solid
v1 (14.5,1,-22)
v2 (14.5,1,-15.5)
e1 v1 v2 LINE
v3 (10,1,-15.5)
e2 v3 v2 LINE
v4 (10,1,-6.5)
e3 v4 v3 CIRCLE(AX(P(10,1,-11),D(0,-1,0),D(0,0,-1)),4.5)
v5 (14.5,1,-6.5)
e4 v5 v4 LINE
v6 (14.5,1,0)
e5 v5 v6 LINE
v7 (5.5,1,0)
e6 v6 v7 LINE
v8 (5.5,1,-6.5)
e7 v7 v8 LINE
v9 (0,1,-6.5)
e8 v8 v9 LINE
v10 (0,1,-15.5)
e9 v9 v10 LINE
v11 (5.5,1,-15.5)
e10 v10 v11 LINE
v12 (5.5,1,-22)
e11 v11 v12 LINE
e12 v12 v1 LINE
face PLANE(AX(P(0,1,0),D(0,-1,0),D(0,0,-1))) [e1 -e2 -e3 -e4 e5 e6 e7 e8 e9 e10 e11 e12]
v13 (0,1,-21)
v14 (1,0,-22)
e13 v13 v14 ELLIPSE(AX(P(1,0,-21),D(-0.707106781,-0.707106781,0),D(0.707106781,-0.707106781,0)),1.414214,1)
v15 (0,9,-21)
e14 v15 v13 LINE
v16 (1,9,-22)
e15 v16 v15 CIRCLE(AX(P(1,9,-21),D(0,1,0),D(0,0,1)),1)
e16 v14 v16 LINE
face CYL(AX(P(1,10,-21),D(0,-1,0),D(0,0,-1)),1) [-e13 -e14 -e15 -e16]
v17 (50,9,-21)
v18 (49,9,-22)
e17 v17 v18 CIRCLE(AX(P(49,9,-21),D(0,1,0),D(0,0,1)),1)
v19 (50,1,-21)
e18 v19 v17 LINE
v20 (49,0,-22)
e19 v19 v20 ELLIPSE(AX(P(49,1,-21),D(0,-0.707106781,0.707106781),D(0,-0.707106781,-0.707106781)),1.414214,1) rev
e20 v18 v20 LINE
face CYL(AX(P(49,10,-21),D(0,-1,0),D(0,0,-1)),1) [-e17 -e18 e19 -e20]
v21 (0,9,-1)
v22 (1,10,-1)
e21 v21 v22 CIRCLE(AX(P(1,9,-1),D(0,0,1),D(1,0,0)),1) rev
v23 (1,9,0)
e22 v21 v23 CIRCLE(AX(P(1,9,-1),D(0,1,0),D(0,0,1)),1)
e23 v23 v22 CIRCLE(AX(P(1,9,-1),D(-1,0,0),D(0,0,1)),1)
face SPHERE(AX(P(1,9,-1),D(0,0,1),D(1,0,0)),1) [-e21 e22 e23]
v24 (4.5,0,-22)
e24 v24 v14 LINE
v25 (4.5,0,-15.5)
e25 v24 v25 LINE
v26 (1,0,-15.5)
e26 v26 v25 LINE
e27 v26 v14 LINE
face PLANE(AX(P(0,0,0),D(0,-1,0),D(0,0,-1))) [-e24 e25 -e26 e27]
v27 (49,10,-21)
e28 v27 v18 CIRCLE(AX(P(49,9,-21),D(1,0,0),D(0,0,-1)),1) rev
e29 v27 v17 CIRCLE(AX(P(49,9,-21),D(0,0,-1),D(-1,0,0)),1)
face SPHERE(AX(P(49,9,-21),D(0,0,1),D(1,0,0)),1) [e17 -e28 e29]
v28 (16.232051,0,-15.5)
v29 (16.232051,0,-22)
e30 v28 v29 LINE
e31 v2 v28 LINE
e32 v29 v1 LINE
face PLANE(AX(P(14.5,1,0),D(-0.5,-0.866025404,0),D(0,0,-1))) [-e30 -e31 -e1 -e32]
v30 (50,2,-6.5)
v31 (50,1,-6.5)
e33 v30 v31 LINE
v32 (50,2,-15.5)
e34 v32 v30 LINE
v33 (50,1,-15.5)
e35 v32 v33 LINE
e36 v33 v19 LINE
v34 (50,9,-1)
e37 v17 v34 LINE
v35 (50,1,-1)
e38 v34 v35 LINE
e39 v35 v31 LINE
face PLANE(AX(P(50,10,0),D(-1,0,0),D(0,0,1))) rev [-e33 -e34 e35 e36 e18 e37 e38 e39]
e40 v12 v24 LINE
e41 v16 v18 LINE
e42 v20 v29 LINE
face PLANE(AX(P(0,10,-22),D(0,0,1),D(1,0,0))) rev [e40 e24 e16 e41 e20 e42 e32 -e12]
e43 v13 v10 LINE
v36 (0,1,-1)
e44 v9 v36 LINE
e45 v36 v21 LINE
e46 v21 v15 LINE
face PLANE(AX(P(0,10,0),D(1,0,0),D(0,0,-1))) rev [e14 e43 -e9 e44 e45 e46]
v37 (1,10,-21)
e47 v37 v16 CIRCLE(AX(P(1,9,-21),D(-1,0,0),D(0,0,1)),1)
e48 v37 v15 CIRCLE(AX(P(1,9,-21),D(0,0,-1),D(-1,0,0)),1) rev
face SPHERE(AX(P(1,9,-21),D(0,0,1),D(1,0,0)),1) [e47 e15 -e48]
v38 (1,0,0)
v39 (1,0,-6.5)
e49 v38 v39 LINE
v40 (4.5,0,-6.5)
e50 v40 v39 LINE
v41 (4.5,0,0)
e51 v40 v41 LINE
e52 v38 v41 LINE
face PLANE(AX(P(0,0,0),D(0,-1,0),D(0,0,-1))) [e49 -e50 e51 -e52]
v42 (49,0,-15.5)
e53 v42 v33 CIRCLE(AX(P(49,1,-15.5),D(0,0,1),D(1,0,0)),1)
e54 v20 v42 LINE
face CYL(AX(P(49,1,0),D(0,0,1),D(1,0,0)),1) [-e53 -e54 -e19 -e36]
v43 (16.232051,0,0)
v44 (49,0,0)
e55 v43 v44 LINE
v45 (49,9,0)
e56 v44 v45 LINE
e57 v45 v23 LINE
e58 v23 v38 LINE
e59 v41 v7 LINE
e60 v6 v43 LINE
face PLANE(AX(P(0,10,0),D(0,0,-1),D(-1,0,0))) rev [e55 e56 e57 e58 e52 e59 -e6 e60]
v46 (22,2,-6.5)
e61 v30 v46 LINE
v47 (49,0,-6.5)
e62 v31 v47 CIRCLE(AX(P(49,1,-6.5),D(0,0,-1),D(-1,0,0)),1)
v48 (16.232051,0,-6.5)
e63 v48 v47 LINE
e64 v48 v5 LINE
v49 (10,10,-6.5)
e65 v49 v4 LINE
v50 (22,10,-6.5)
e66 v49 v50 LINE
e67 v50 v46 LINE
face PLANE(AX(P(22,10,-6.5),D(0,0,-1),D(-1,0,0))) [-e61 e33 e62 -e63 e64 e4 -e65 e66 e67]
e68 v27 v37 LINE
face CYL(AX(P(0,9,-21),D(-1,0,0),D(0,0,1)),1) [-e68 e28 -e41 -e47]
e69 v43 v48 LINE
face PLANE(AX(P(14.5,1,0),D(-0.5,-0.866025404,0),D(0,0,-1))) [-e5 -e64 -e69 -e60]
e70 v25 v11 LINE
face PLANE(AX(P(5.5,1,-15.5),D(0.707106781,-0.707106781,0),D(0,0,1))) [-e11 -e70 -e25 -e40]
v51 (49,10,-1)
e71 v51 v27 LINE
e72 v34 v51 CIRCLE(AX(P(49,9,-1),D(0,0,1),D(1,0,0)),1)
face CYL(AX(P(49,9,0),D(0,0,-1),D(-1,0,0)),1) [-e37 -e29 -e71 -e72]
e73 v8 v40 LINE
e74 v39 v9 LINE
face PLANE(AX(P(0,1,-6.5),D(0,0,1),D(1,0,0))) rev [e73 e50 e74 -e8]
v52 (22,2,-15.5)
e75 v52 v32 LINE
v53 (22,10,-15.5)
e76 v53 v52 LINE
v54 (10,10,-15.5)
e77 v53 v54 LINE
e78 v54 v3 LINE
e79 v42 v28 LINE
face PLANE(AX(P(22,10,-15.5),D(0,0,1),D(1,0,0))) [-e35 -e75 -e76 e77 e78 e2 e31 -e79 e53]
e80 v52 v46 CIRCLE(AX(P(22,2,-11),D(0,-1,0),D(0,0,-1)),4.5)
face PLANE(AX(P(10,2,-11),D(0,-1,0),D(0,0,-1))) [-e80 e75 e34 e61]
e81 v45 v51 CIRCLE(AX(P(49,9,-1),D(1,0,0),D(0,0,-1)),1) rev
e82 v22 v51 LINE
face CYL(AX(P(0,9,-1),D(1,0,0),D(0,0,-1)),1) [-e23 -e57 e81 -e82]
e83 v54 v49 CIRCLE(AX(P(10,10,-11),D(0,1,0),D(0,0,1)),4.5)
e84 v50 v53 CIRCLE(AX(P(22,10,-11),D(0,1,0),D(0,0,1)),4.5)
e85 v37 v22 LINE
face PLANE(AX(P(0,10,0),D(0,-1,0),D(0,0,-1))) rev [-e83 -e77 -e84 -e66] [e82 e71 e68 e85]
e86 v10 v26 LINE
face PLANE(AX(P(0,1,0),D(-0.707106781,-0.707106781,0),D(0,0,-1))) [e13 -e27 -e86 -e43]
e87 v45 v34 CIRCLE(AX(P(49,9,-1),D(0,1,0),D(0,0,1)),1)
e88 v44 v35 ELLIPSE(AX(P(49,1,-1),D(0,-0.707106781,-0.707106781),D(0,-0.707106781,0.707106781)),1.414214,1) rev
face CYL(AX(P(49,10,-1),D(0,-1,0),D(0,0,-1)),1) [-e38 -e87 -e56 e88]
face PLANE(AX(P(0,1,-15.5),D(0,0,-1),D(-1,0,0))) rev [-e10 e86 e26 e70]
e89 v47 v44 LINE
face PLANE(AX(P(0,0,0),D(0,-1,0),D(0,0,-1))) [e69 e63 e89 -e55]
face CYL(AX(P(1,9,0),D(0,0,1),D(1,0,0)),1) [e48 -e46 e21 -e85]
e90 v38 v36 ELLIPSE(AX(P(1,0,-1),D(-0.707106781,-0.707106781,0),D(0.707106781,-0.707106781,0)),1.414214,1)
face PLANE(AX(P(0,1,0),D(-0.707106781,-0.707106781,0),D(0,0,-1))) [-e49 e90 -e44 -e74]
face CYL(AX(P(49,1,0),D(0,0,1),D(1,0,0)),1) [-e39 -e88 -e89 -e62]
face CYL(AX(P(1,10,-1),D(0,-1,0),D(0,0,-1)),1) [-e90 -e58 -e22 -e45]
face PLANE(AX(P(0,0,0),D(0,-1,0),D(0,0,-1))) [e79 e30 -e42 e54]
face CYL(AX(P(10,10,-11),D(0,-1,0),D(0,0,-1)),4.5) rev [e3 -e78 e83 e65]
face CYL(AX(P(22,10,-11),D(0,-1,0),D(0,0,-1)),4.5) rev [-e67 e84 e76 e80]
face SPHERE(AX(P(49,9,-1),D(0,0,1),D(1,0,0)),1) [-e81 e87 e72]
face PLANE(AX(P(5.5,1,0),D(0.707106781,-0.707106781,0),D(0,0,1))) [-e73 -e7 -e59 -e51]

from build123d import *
from OCP.BRepFilletAPI import BRepFilletAPI_MakeChamfer

# Parameters (mm, degrees)
SKETCH_1_W          = 50
SKETCH_1_H          = 22
EXTRUDE_1_DEPTH     = 10
CUT_EXTRUDE_1_DEPTH = 2
CUT_EXTRUDE_2_DEPTH = 1
CHAMFER_1_SIZE      = 1
CHAMFER_2_SIZE      = 1
CHAMFER_2_SIZE_2    = 1.732050808
FILLET_1_R          = 1


with BuildPart() as part:
    # 草图1 → 凸台-拉伸1 (new body)
    with BuildSketch(Plane(origin=(0, 0, 0), x_dir=(1, 0, 0), z_dir=(0, 1, 0))):
        with Locations((25, 11)):
            Rectangle(SKETCH_1_W, SKETCH_1_H)
        with BuildLine():
            Line((22, 6.5), (10, 6.5))
            ThreePointArc((10, 6.5), (5.5, 11), (10, 15.5))
            Line((10, 15.5), (22, 15.5))
            ThreePointArc((22, 15.5), (26.5, 11), (22, 6.5))
        make_face(mode=Mode.SUBTRACT)
    extrude(amount=EXTRUDE_1_DEPTH)

    # 草图2 → 切除-拉伸1 (cut)
    with BuildSketch(Plane.XZ):
        with BuildLine():
            Line((50, -6.5), (50, -15.5))
            Line((50, -15.5), (10, -15.5))
            ThreePointArc((10, -15.5), (5.5, -11), (10, -6.5))
            Line((10, -6.5), (50, -6.5))
        make_face()
    extrude(amount=-CUT_EXTRUDE_1_DEPTH, mode=Mode.SUBTRACT)

    # 草图3 → 切除-拉伸2 (cut)
    with BuildSketch(Plane.XZ):
        Polygon((0, -6.5), (5.5, -6.5), (5.5, 0), (14.5, 0), (14.5, -22), (5.5, -22), (5.5, -15.5), (0, -15.5), align=None)
    extrude(amount=-CUT_EXTRUDE_2_DEPTH, mode=Mode.SUBTRACT)

    # 倒角1
    chamfer_1_edges = [part.edges().sort_by_distance(p)[0] for p in [
        (0, 0, -18.75),
        (5.5, 0, -18.75),
        (5.5, 0, -3.25),
        (0, 0, -3.25),
    ]]
    chamfer(chamfer_1_edges, length=CHAMFER_1_SIZE - 0.0001)  # a hair under: the kernel refuses the full size

    # 倒角2
    chamfer_2_edges_1 = [part.edges().sort_by_distance(p)[0] for p in [
        (14.5, 0, -18.75),
    ]]
    chamfer_2_side_1 = [part.faces().sort_by_distance(p)[0] for p in [
        (14.5, 0.02, -18.75),
    ]]
    chamfer_2_edges_2 = [part.edges().sort_by_distance(p)[0] for p in [
        (14.5, 0, -3.25),
    ]]
    chamfer_2_side_2 = [part.faces().sort_by_distance(p)[0] for p in [
        (14.5, 0.02, -3.25),
    ]]
    chamfer_2 = BRepFilletAPI_MakeChamfer(part.part.solid().wrapped)
    for e in chamfer_2_edges_1:
        chamfer_2.Add(CHAMFER_2_SIZE - 0.0001, CHAMFER_2_SIZE_2 - 0.0001, e.wrapped, chamfer_2_side_1[0].wrapped)
    for e in chamfer_2_edges_2:
        chamfer_2.Add(CHAMFER_2_SIZE - 0.0001, CHAMFER_2_SIZE_2 - 0.0001, e.wrapped, chamfer_2_side_2[0].wrapped)
    add(Compound.cast(chamfer_2.Shape()), mode=Mode.REPLACE)  # a hair under: the kernel refuses the full size

    # 圆角1
    fillet_1_edges = [part.edges().sort_by_distance(p)[0] for p in [
        (25, 10, -22),
        (50, 10, -11),
        (25, 10, 0),
        (0, 10, -11),
        (50, 5, 0),
        (50, 5, -22),
        (0, 5.49995, -22),
        (0, 5.49995, 0),
        (50, 0, -18.75),
        (50, 0, -3.25),
    ]]
    fillet(fillet_1_edges, radius=FILLET_1_R)


solid = part.part
